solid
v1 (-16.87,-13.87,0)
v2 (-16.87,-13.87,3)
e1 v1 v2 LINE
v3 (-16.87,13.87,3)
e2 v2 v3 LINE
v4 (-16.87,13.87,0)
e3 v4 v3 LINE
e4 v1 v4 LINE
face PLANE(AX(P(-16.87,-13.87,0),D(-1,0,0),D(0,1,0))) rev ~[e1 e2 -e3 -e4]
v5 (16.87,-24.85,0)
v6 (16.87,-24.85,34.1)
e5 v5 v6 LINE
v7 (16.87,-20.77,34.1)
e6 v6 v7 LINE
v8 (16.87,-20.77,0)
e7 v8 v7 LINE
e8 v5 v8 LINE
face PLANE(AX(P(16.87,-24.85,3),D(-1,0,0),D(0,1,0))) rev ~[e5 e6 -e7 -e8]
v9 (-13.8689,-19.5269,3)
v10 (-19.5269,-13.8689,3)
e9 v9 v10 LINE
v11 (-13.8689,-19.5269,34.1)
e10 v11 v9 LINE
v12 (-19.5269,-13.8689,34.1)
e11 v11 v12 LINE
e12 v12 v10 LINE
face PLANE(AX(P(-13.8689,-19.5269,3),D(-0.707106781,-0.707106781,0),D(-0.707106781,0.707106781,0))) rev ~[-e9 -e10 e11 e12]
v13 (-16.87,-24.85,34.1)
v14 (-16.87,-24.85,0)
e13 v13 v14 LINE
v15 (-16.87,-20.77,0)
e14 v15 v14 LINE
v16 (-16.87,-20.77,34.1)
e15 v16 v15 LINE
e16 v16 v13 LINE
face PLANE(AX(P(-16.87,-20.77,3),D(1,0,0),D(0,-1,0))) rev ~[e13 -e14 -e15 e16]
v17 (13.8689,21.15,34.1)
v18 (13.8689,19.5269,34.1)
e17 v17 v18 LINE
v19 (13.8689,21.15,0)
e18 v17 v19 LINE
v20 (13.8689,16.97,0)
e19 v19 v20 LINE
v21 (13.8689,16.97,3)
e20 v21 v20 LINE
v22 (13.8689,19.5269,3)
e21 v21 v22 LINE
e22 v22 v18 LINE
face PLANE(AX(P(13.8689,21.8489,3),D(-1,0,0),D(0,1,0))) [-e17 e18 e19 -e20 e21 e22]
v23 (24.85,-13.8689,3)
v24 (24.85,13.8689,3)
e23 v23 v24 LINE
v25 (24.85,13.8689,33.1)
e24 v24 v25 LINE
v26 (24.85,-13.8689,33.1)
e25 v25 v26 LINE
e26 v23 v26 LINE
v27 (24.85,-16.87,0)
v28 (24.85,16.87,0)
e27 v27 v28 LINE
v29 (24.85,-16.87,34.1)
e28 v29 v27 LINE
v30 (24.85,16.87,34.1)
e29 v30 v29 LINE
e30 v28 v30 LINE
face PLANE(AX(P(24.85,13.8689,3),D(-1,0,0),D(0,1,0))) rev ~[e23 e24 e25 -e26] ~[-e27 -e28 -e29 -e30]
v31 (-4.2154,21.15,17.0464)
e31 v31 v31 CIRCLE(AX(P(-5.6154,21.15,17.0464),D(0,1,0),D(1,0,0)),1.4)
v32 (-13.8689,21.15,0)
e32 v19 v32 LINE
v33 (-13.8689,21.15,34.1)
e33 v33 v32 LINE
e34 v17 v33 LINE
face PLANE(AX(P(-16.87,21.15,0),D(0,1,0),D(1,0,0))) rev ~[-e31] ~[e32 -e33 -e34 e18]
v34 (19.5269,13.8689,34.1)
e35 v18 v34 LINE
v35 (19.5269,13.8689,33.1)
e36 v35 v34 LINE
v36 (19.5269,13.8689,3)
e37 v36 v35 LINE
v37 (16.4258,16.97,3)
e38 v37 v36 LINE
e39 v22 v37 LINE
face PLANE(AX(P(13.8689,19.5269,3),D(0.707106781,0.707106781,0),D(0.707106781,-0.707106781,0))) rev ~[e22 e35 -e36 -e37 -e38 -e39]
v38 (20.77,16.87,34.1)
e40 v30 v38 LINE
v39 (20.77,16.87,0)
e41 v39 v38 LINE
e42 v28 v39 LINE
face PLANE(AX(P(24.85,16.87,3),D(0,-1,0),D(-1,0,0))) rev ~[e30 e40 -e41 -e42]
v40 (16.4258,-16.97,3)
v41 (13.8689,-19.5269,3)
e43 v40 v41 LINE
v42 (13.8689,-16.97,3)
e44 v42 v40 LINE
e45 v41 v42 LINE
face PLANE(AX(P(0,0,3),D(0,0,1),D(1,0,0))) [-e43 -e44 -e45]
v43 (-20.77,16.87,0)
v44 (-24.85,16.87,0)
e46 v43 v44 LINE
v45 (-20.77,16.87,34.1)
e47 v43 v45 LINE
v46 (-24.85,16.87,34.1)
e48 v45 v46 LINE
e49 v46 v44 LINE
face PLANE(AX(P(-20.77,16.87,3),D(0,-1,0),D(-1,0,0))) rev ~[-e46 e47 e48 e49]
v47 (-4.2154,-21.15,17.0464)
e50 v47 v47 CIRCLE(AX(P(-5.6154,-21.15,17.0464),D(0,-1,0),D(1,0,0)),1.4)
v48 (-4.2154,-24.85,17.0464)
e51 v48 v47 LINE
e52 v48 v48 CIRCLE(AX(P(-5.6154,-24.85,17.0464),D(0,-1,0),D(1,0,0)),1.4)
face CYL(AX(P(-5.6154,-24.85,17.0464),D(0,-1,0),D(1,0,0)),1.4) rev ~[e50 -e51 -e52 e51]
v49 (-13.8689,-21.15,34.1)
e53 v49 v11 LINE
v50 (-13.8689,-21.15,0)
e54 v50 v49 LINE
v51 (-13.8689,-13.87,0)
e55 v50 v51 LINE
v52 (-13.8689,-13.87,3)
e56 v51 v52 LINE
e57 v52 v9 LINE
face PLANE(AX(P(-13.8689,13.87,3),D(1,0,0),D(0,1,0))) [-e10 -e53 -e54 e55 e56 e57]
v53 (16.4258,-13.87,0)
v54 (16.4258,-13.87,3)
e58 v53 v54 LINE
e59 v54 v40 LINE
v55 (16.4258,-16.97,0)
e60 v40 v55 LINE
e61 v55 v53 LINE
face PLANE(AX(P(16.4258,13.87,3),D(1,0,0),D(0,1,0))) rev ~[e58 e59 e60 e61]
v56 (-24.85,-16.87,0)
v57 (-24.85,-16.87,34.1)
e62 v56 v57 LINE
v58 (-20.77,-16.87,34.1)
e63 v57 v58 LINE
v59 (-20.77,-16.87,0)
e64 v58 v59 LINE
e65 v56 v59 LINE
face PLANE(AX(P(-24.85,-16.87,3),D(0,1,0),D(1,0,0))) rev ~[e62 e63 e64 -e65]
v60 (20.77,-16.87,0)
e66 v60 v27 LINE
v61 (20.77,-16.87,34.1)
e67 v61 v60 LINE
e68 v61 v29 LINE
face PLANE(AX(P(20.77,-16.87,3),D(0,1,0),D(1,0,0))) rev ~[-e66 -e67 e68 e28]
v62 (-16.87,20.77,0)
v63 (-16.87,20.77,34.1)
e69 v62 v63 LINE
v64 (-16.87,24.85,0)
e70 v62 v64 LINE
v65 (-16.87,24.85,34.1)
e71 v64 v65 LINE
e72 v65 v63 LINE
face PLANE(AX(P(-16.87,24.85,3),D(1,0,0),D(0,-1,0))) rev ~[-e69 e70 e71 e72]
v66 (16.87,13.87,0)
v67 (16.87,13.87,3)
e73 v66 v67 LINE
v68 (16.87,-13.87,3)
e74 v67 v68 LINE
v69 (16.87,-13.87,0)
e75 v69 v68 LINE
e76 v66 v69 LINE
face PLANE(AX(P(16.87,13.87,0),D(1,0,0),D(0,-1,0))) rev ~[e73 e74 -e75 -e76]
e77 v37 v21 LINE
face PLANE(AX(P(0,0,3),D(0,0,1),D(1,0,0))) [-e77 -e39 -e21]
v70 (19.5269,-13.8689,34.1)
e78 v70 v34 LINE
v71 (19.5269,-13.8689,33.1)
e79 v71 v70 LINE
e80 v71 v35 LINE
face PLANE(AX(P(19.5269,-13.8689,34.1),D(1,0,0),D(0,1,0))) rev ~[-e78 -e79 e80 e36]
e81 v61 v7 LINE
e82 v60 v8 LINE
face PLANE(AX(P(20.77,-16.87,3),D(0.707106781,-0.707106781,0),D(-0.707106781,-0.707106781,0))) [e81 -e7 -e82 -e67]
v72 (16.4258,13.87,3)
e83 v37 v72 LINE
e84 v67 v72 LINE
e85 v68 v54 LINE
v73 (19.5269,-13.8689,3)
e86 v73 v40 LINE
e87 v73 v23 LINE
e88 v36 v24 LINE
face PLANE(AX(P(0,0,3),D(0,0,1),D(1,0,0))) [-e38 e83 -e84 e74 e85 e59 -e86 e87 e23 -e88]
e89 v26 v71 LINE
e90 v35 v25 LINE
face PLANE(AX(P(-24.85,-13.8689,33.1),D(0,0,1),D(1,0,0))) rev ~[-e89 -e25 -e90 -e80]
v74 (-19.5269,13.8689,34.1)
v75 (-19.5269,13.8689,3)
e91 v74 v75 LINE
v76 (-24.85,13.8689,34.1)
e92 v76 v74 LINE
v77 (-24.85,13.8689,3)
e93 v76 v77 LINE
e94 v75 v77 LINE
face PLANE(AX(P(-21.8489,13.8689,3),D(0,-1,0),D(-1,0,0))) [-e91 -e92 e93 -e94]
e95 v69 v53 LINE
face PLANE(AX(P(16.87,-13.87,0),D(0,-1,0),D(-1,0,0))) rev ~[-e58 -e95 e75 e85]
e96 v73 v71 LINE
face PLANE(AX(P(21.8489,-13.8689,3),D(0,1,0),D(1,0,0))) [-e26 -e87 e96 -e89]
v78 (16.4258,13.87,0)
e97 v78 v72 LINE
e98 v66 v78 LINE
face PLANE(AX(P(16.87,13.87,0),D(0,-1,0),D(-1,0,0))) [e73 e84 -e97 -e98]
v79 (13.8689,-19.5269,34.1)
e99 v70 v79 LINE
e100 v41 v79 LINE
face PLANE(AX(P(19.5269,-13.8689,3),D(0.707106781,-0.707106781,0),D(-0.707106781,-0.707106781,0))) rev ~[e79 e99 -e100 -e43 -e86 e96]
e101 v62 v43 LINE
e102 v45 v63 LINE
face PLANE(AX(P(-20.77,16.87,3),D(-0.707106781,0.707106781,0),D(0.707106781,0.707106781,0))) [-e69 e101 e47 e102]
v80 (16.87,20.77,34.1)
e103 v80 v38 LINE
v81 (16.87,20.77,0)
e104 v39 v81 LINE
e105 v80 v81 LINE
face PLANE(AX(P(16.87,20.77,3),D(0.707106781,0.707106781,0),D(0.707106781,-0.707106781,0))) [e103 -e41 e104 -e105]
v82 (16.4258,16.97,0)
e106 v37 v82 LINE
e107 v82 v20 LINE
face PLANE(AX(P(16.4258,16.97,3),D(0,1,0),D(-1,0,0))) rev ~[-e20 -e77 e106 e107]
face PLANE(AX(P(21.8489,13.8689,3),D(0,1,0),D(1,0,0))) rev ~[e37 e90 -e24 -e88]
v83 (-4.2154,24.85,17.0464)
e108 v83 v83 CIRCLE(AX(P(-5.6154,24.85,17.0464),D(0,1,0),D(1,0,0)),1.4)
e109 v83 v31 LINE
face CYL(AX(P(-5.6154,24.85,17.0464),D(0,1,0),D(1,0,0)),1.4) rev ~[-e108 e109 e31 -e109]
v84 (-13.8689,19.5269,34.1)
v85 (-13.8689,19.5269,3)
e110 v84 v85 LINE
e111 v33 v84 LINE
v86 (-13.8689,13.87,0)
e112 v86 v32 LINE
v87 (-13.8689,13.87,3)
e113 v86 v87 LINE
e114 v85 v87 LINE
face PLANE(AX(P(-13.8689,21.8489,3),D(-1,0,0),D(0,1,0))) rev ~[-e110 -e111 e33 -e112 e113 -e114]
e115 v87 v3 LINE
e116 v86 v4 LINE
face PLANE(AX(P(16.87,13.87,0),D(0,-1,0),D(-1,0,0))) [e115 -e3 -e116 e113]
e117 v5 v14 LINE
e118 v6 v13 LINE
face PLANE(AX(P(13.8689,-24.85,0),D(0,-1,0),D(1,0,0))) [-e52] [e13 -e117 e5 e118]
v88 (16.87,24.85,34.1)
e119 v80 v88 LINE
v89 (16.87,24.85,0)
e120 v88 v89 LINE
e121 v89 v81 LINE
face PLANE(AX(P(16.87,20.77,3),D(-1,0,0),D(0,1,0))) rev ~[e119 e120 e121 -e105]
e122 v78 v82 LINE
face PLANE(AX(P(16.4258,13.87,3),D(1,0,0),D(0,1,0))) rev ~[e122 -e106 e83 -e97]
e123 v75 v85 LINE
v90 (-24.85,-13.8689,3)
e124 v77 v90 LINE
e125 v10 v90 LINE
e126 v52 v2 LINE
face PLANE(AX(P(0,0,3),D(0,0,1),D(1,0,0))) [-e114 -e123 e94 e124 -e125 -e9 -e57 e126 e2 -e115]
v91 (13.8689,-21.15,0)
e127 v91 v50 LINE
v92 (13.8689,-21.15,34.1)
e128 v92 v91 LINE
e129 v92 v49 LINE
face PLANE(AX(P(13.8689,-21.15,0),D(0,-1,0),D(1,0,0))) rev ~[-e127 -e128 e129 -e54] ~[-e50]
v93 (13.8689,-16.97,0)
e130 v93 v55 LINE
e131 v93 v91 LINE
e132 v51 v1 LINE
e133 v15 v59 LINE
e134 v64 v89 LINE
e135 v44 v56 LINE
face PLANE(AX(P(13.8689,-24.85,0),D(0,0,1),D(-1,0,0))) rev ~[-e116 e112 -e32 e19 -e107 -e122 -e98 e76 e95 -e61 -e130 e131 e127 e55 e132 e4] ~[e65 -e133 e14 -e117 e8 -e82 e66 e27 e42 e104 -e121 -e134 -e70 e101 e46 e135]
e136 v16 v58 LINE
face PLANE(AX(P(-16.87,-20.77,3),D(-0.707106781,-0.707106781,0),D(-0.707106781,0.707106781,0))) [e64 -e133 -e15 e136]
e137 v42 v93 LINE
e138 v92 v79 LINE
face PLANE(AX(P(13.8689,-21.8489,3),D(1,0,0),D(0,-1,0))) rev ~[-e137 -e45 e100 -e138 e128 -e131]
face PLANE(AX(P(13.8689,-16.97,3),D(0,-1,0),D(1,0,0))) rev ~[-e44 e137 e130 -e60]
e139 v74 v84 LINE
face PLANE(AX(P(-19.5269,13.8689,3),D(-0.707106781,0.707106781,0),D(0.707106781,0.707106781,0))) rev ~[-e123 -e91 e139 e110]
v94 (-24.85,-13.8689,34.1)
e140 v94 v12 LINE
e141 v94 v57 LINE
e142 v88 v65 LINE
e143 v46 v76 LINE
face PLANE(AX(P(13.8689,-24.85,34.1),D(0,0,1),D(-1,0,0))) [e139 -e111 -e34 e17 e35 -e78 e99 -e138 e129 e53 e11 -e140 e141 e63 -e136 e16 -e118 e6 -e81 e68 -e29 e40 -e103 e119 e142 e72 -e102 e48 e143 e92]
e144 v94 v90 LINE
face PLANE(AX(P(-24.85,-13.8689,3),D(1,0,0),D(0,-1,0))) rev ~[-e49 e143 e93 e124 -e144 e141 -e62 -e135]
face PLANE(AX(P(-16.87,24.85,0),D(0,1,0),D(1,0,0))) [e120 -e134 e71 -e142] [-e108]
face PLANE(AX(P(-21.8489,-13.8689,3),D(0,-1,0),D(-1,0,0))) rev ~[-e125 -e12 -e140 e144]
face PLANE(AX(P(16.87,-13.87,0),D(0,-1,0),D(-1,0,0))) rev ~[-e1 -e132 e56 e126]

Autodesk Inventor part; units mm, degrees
ref_plane "Work Plane1" through (0, 0, 0) normal (0, 0, 1) x (1, 0, 0)
sketch "Sketch1" plane through (0, 0, 0) normal (0, 0, 1) x (1, 0, 0)
  arc A0 (12.5934, -5.8404) -> (12.8401, -5.9947) centre (12.8241, -5.7459) ccw construction
  line L0 (12.8401, -5.9947) -> (16.4715, -5.9947) construction
  line L1 (16.4715, -5.9947) -> (16.97, -5.4961) construction
  line L2 (16.97, -5.4961) -> (16.97, 1.583) construction
  arc A1 (16.97, 2.3806) -> (16.97, 1.583) centre (17.2691, 1.9818) ccw construction
  line L3 (16.97, 2.3806) -> (16.97, 5.4715) construction
  line L4 (16.97, 5.4715) -> (16.4715, 5.97) construction
  line L5 (16.4715, 5.97) -> (12.8401, 5.97) construction
  arc A2 (12.8401, 5.97) -> (12.6094, 5.8152) centre (12.8401, 5.7207) ccw construction
  arc A3 (12.0954, 5.2394) -> (12.6094, 5.8152) centre (11.5075, 6.2814) ccw construction
  arc A4 (12.0954, 5.2394) -> (11.974, 5.0466) centre (12.2223, 5.0248) ccw construction
  line L6 (11.974, 5.0466) -> (11.9439, 4.702) construction
  arc A5 (11.6955, 4.4744) -> (11.9439, 4.702) centre (11.6955, 4.7237) ccw construction
  line L7 (11.6955, 4.4744) -> (11.2445, 4.4744) construction
  arc A6 (10.9961, 4.702) -> (11.2445, 4.4744) centre (11.2445, 4.7237) ccw construction
  line L8 (10.9961, 4.702) -> (10.9642, 5.0674) construction
  arc A7 (10.9642, 5.0674) -> (10.8487, 5.2566) centre (10.7158, 5.0457) ccw construction
  arc A8 (10.3792, 5.8152) -> (10.8487, 5.2566) centre (11.4862, 6.2691) ccw construction
  arc A9 (10.3792, 5.8152) -> (10.1485, 5.97) centre (10.1485, 5.7206) ccw construction
  line L9 (10.1485, 5.97) -> (9.4685, 5.97) construction
  line L10 (9.4685, 5.97) -> (8.97, 5.4715) construction
  line L11 (8.97, 5.4715) -> (8.97, -5.4961) construction
  line L12 (8.97, -5.4961) -> (9.4685, -5.9947) construction
  line L13 (9.4685, -5.9947) -> (10.1412, -5.9947) construction
  arc A10 (10.1412, -5.9947) -> (10.3791, -5.84) centre (10.1485, -5.7455) ccw construction
  arc A11 (10.8487, -5.2813) -> (10.3791, -5.84) centre (11.4862, -6.2938) ccw construction
  arc A12 (10.8487, -5.2813) -> (10.9642, -5.0921) centre (10.7158, -5.0704) ccw construction
  line L14 (10.9642, -5.0921) -> (10.9961, -4.7266) construction
  arc A13 (11.2445, -4.4991) -> (10.9961, -4.7266) centre (11.2445, -4.7483) ccw construction
  line L15 (11.2445, -4.4991) -> (11.6955, -4.4991) construction
  arc A14 (11.9439, -4.7266) -> (11.6955, -4.4991) centre (11.6955, -4.7483) ccw construction
  line L16 (11.9439, -4.7266) -> (11.974, -5.0712) construction
  arc A15 (11.974, -5.0712) -> (12.0954, -5.264) centre (12.2223, -5.0495) ccw construction
  arc A16 (12.5934, -5.8404) -> (12.0954, -5.264) centre (11.4862, -6.2938) ccw construction
  arc A17 (24.85, 22.85) -> (22.85, 24.85) centre (22.85, 22.85) ccw construction
  line L17 (22.85, 24.85) -> (-16.97, 24.85) construction
  line L18 (-16.97, 24.85) -> (-16.97, 21.15) construction
  line L19 (-16.97, 21.15) -> (16.97, 21.15) construction
  line L20 (16.97, 16.97) -> (16.97, 21.15) construction
  line L21 (21.15, 16.97) -> (16.97, 16.97) construction
  line L22 (21.15, 16.97) -> (21.15, -16.97) construction
  line L23 (21.15, -16.97) -> (24.85, -16.97) construction
  line L24 (24.85, -16.97) -> (24.85, 22.85) construction
  line L25 (23.75, 23.25) -> (23.75, 18.15) construction
  arc A18 (23.25, 17.65) -> (23.75, 18.15) centre (23.25, 18.15) ccw construction
  line L26 (23.25, 17.65) -> (20.8937, 17.65) construction
  arc A19 (20.5239, 17.8134) -> (20.8937, 17.65) centre (20.8937, 18.15) ccw construction
  line L27 (20.5239, 17.8134) -> (17.7803, 20.8273) construction
  arc A20 (17.65, 21.1639) -> (17.7803, 20.8273) centre (18.15, 21.1639) ccw construction
  line L28 (17.65, 21.1639) -> (17.65, 23.25) construction
  arc A21 (18.15, 23.75) -> (17.65, 23.25) centre (18.15, 23.25) ccw construction
  line L29 (18.15, 23.75) -> (23.25, 23.75) construction
  arc A22 (23.75, 23.25) -> (23.25, 23.75) centre (23.25, 23.25) ccw construction
  arc A23 (-24.85, -22.85) -> (-22.85, -24.85) centre (-22.85, -22.85) ccw construction
  line L30 (-22.85, -24.85) -> (16.97, -24.85) construction
  line L31 (16.97, -24.85) -> (16.97, -21.15) construction
  line L32 (16.97, -21.15) -> (-16.97, -21.15) construction
  line L33 (-16.97, -16.97) -> (-16.97, -21.15) construction
  line L34 (-21.15, -16.97) -> (-16.97, -16.97) construction
  line L35 (-21.15, -16.97) -> (-21.15, 16.97) construction
  line L36 (-21.15, 16.97) -> (-24.85, 16.97) construction
  line L37 (-24.85, 16.97) -> (-24.85, -22.85) construction
  line L38 (-20.8273, -17.7803) -> (-17.8134, -20.5239) construction
  arc A24 (-17.65, -20.8937) -> (-17.8134, -20.5239) centre (-18.15, -20.8937) ccw construction
  line L39 (-17.65, -20.8937) -> (-17.65, -23.25) construction
  arc A25 (-18.15, -23.75) -> (-17.65, -23.25) centre (-18.15, -23.25) ccw construction
  line L40 (-18.15, -23.75) -> (-23.25, -23.75) construction
  arc A26 (-23.75, -23.25) -> (-23.25, -23.75) centre (-23.25, -23.25) ccw construction
  line L41 (-23.75, -23.25) -> (-23.75, -18.15) construction
  arc A27 (-23.25, -17.65) -> (-23.75, -18.15) centre (-23.25, -18.15) ccw construction
  line L42 (-23.25, -17.65) -> (-21.1639, -17.65) construction
  arc A28 (-20.8273, -17.7803) -> (-21.1639, -17.65) centre (-21.1639, -18.15) ccw construction
  arc A29 (-22.85, 24.85) -> (-24.85, 22.85) centre (-22.85, 22.85) ccw construction
  line L43 (-22.85, 24.85) -> (16.97, 24.85) construction
  line L44 (16.97, 24.85) -> (16.97, 21.15) construction
  line L45 (16.97, 21.15) -> (-16.97, 21.15) construction
  line L46 (-16.97, 16.97) -> (-16.97, 21.15) construction
  line L47 (-21.15, 16.97) -> (-16.97, 16.97) construction
  line L48 (-21.15, 16.97) -> (-21.15, -16.97) construction
  line L49 (-21.15, -16.97) -> (-24.85, -16.97) construction
  line L50 (-24.85, -16.97) -> (-24.85, 22.85) construction
  line L51 (-20.8273, 17.7803) -> (-17.8134, 20.5239) construction
  arc A30 (-17.8134, 20.5239) -> (-17.65, 20.8937) centre (-18.15, 20.8937) ccw construction
  line L52 (-17.65, 20.8937) -> (-17.65, 23.25) construction
  arc A31 (-17.65, 23.25) -> (-18.15, 23.75) centre (-18.15, 23.25) ccw construction
  line L53 (-18.15, 23.75) -> (-23.25, 23.75) construction
  arc A32 (-23.25, 23.75) -> (-23.75, 23.25) centre (-23.25, 23.25) ccw construction
  line L54 (-23.75, 23.25) -> (-23.75, 18.15) construction
  arc A33 (-23.75, 18.15) -> (-23.25, 17.65) centre (-23.25, 18.15) ccw construction
  line L55 (-23.25, 17.65) -> (-21.1639, 17.65) construction
  arc A34 (-21.1639, 17.65) -> (-20.8273, 17.7803) centre (-21.1639, 18.15) ccw construction
  arc A35 (22.85, -24.85) -> (24.85, -22.85) centre (22.85, -22.85) ccw construction
  line L56 (22.85, -24.85) -> (-16.97, -24.85) construction
  line L57 (-16.97, -24.85) -> (-16.97, -21.15) construction
  line L58 (-16.97, -21.15) -> (16.97, -21.15) construction
  line L59 (16.97, -16.97) -> (16.97, -21.15) construction
  line L60 (21.15, -16.97) -> (16.97, -16.97) construction
  line L61 (21.15, -16.97) -> (21.15, 16.97) construction
  line L62 (21.15, 16.97) -> (24.85, 16.97) construction
  line L63 (24.85, 16.97) -> (24.85, -22.85) construction
  line L64 (23.75, -23.25) -> (23.75, -18.15) construction
  arc A36 (23.75, -18.15) -> (23.25, -17.65) centre (23.25, -18.15) ccw construction
  line L65 (23.25, -17.65) -> (20.8937, -17.65) construction
  arc A37 (20.8937, -17.65) -> (20.5239, -17.8134) centre (20.8937, -18.15) ccw construction
  line L66 (20.5239, -17.8134) -> (17.7803, -20.8273) construction
  arc A38 (17.7803, -20.8273) -> (17.65, -21.1639) centre (18.15, -21.1639) ccw construction
  line L67 (17.65, -21.1639) -> (17.65, -23.25) construction
  arc A39 (17.65, -23.25) -> (18.15, -23.75) centre (18.15, -23.25) ccw construction
  line L68 (18.15, -23.75) -> (23.25, -23.75) construction
  arc A40 (23.25, -23.75) -> (23.75, -23.25) centre (23.25, -23.25) ccw construction
  circle A41 centre (0.47, -10.47) radius 1.1 construction
  circle A42 centre (0.47, 12.53) radius 1.025 construction
  line L69 (24.85, 16.87) -> (16.87, 16.87)
  line L70 (16.87, 16.87) -> (16.87, -16.87)
  line L71 (16.87, -16.87) -> (24.85, -16.87)
  line L72 (24.85, -16.87) -> (24.85, 16.87)
  line L73 (-16.87, 24.85) -> (16.87, 24.85)
  line L74 (16.87, 24.85) -> (16.87, 13.87)
  line L75 (16.87, 13.87) -> (-16.87, 13.87)
  line L76 (-16.87, 13.87) -> (-16.87, 24.85)
  line L77 (-16.87, 16.87) -> (-24.85, 16.87)
  line L78 (-24.85, 16.87) -> (-24.85, -16.87)
  line L79 (-24.85, -16.87) -> (-16.87, -16.87)
  line L80 (-16.87, -16.87) -> (-16.87, 16.87)
  line L81 (-16.87, -24.85) -> (16.87, -24.85)
  line L82 (16.87, -24.85) -> (16.87, -13.87)
  line L83 (16.87, -13.87) -> (-16.87, -13.87)
  line L84 (-16.87, -13.87) -> (-16.87, -24.85)
  point P0 (0, 0)
extrude "Extrusion1" add sketch "Sketch1" along normal blind 3 contours L72 L71 L70 L69 | L70 L75 L76 L73 L74 | L82 L81 L84 L80 L83 L70 | L80 L79 L78 L77 L76
chamfer "Chamfer1" distance 3.9 angle 45 4 edges at (16.87, -16.87, 1.5) (-16.87, -16.87, 1.5) (-16.87, 16.87, 1.5) (16.87, 16.87, 1.5)
sketch "Sketch2" plane through (0, 0, 3) normal (0, 0, 1) x (1, 0, 0)
  line L0 (-16.87, -13.87) -> (-16.87, 13.87) projected
  line L1 (-16.87, 13.87) -> (16.87, 13.87) projected
  line L2 (16.87, 13.87) -> (16.87, -13.87) projected
  line L3 (16.87, -13.87) -> (-16.87, -13.87) projected
  line L4 (-16.87, -20.77) -> (-16.87, -24.85) projected
  line L5 (-16.87, -24.85) -> (16.87, -24.85) projected
  line L6 (16.87, -24.85) -> (16.87, -20.77) projected
  line L7 (20.77, -16.87) -> (16.87, -20.77) projected
  line L8 (20.77, -16.87) -> (24.85, -16.87) projected
  line L9 (24.85, -16.87) -> (24.85, 16.87) projected
  line L10 (24.85, 16.87) -> (20.77, 16.87) projected
  line L11 (16.87, 20.77) -> (20.77, 16.87) projected
  line L12 (16.87, 20.77) -> (16.87, 24.85) projected
  line L13 (16.87, 24.85) -> (-16.87, 24.85) projected
  line L14 (-16.87, 24.85) -> (-16.87, 20.77) projected
  line L15 (-20.77, 16.87) -> (-16.87, 20.77) projected
  line L16 (-20.77, 16.87) -> (-24.85, 16.87) projected
  line L17 (-24.85, 16.87) -> (-24.85, -16.87) projected
  line L18 (-24.85, -16.87) -> (-20.77, -16.87) projected
  line L19 (-16.87, -20.77) -> (-20.77, -16.87) projected
  line L20 (13.8689, -19.5269) -> (13.8689, -21.8489)
  line L21 (-13.8689, -21.8489) -> (-13.8689, -19.5269)
  line L22 (-13.8689, -19.5269) -> (-19.5269, -13.8689)
  line L23 (-19.5269, -13.8689) -> (-21.8489, -13.8689)
  line L24 (-21.8489, 13.8689) -> (-19.5269, 13.8689)
  line L25 (-19.5269, 13.8689) -> (-13.8689, 19.5269)
  line L26 (-13.8689, 19.5269) -> (-13.8689, 21.8489)
  line L27 (13.8689, 21.8489) -> (13.8689, 19.5269)
  line L28 (13.8689, 19.5269) -> (19.5269, 13.8689)
  line L29 (19.5269, 13.8689) -> (21.8489, 13.8689)
  line L30 (21.8489, -13.8689) -> (19.5269, -13.8689)
  line L31 (19.5269, -13.8689) -> (13.8689, -19.5269)
  line L32 (13.8689, -21.8489) -> (13.8689, -24.85)
  line L33 (16.87, -24.85) -> (-16.87, -24.85) projected
  line L34 (21.8489, -13.8689) -> (24.85, -13.8689)
  line L35 (24.85, -16.87) -> (24.85, 16.87) projected
  line L36 (21.8489, 13.8689) -> (24.85, 13.8689)
  line L37 (13.8689, 21.8489) -> (13.8689, 24.85)
  line L38 (-13.8689, 21.8489) -> (-13.8689, 24.85)
  line L39 (-21.8489, 13.8689) -> (-24.85, 13.8689)
  line L40 (-21.8489, -13.8689) -> (-24.85, -13.8689)
  line L41 (-13.8689, -21.8489) -> (-13.8689, -24.85)
  line L42 (13.8689, -21.8489) -> (11.5469, -21.8489)
  line L43 (-11.5469, -21.8489) -> (-13.8689, -21.8489)
  line L44 (21.8489, 13.8689) -> (21.8489, 11.5469)
  line L45 (21.8489, -11.5469) -> (21.8489, -13.8689)
  line L46 (-21.8489, -13.8689) -> (-21.8489, -11.5469)
  line L47 (-21.8489, 11.5469) -> (-21.8489, 13.8689)
  line L48 (-13.8689, 21.8489) -> (-11.5469, 21.8489)
  line L49 (11.5469, 21.8489) -> (13.8689, 21.8489)
  point P0 (0, 0)
  dimension "d13" = 3.0011
ref_plane "Work Plane2" through (-16.97, -24.85, 34.1) normal (0, 0, -1) x (0, 1, 0)
extrude "Extrusion2" add sketch "Sketch2" along normal up to surface (31.1 mm away) contours L32 L20 L31 L30 L34 L9 L8 L7 L6 L5
pattern_circular "Circular Pattern1" count 4 over 360 about axis through (0, 0, 17.13) along (0, 0, -1) of "Extrusion2"
sketch "Sketch3" plane through (-24.85, -13.8689, 34.1) normal (0, 0, 1) x (1, 0, 0)
  circle A0 centre (13.82, 14.8989) radius 1.5 projected
  line L0 (10.9811, -5.658) -> (5.3231, 0) projected
  line L1 (5.3231, 0) -> (0, 0) projected
  line L2 (0, 0) -> (0, -3.0011) projected
  line L3 (0, -3.0011) -> (4.08, -3.0011) projected
  line L4 (4.08, -3.0011) -> (7.98, -6.9011) projected
  line L5 (7.98, -6.9011) -> (7.98, -10.9811) projected
  line L6 (7.98, -10.9811) -> (10.9811, -10.9811) projected
  line L7 (10.9811, -10.9811) -> (10.9811, -5.658) projected
  line L8 (5.3231, 27.7378) -> (10.9811, 33.3958) projected
  line L9 (10.9811, 33.3958) -> (10.9811, 38.7189) projected
  line L10 (10.9811, 38.7189) -> (7.98, 38.7189) projected
  line L11 (7.98, 38.7189) -> (7.98, 34.6389) projected
  line L12 (7.98, 34.6389) -> (4.08, 30.7389) projected
  line L13 (4.08, 30.7389) -> (0, 30.7389) projected
  line L14 (0, 30.7389) -> (0, 27.7378) projected
  line L15 (0, 27.7378) -> (5.3231, 27.7378) projected
  line L16 (10.9811, -10.9811) -> (16.9811, -10.9811)
  line L17 (16.9811, 38.7189) -> (10.9811, 38.7189)
  line L18 (0, 0) -> (0, 27.7378)
  line L19 (0, 0) -> (5.3231, 0)
  line L20 (5.3231, 0) -> (5.3231, 27.7378)
  line L21 (5.3231, 27.7378) -> (0, 27.7378)
  line L22 (0, 27.7378) -> (0, 0)
  line L23 (5.3231, 0) -> (0, 0) projected
  line L24 (5.3231, 0) -> (10.9811, -5.658)
  line L25 (10.9811, 33.3958) -> (5.3231, 27.7378)
  line L26 (38.7189, 38.7189) -> (38.7189, 33.3958) projected
  line L27 (38.7189, -5.658) -> (38.7189, -10.9811) projected
  line L28 (10.9811, -10.9811) -> (38.7189, -10.9811)
  line L29 (38.7189, -10.9811) -> (38.7189, -5.658)
  line L30 (38.7189, -5.658) -> (10.9811, -5.658)
  line L31 (10.9811, -5.658) -> (10.9811, -10.9811)
  line L32 (10.9811, 38.7189) -> (10.9811, 33.3958) projected
  line L33 (10.9811, 38.7189) -> (38.7189, 38.7189)
  line L34 (38.7189, 38.7189) -> (38.7189, 33.3958)
  line L35 (38.7189, 33.3958) -> (10.9811, 33.3958)
  line L36 (10.9811, 33.3958) -> (10.9811, 38.7189)
  line L37 (16.9811, -10.9811) -> (16.9811, -5.658)
  line L38 (16.9811, 33.3958) -> (16.9811, 38.7189)
  line L39 (10.9811, 38.7189) -> (10.9811, 33.3958)
  line L40 (10.9811, -5.658) -> (10.9811, -10.9811)
  line L41 (10.9811, -5.658) -> (10.9811, 0)
  line L42 (10.9811, 27.7378) -> (10.9811, 33.3958)
  line L43 (49.7, 0) -> (44.3769, 0) projected
  line L44 (44.3769, 27.7378) -> (49.7, 27.7378) projected
  line L45 (44.3769, 27.7378) -> (49.7, 27.7378)
  line L46 (49.7, 27.7378) -> (49.7, 0)
  line L47 (49.7, 0) -> (44.3769, 0)
  line L48 (44.3769, 0) -> (44.3769, 27.7378)
  point P0 (24.85, 13.8689)
  dimension "d19" = 6
extrude "Extrusion3" add sketch "Sketch3" against normal blind 1 contours L7 L6 L5 L4 L3 L2 L1 L0 | L15 L14 L13 L12 L11 L10 L9 L8 | L43 L48 L44 L46
sketch "Sketch4" plane through (24.85, -16.87, 0) normal (1, 0, 0) x (0, 0, -1)
  line L0 (37.9, 11.3739) -> (37.9, 18.453) construction
  line L1 (23.6194, 18.453) -> (37.9, 18.453) construction
  arc A0 (22.1806, 18.453) -> (23.6194, 18.453) centre (22.9, 16.8577) ccw construction
  line L2 (-1.3806, 18.453) -> (22.1806, 18.453) construction
  arc A1 (-2.8194, 18.453) -> (-1.3806, 18.453) centre (-2.1, 16.8577) ccw construction
  line L3 (-31.3806, 18.453) -> (-2.8194, 18.453) construction
  arc A2 (-32.8194, 18.453) -> (-31.3806, 18.453) centre (-32.1, 16.8577) ccw construction
  line L4 (-42.1, 18.453) -> (-32.8194, 18.453) construction
  line L5 (-42.1, 11.3739) -> (-42.1, 18.453) construction
  line L6 (-42.1, 11.3739) -> (37.9, 11.3739) construction
  line L7 (37.9, 19.2506) -> (37.9, 22.3415) construction
  line L8 (-42.1, 22.3415) -> (37.9, 22.3415) construction
  line L9 (-42.1, 19.2506) -> (-42.1, 22.3415) construction
  line L10 (-42.1, 19.2506) -> (37.9, 19.2506) construction
  line L11 (-3, 3.0011) -> (-3, 30.7389) construction
  line L12 (-34.1, 33.84) -> (-34.1, -5.98) construction
  line L13 (-3, 11.3739) -> (-34.1, 11.3739)
  line L14 (-34.1, 11.3739) -> (-34.1, 22.3415)
  line L15 (-34.1, 22.3415) -> (-3, 22.3415)
  line L16 (-3, 22.3415) -> (-3, 11.3739)
  line L17 (-34.1, 11.3739) -> (-32.1, 11.3739)
  line L18 (-32.1, 11.3739) -> (-32.1, 3.0011)
  line L19 (-32.1, 3.0011) -> (-34.1, 3.0011)
  line L20 (-34.1, 3.0011) -> (-34.1, 11.3739)
  line L21 (-34.1, 22.3415) -> (-32.1, 22.3415)
  line L22 (-32.1, 22.3415) -> (-32.1, 30.7389)
  line L23 (-32.1, 30.7389) -> (-34.1, 30.7389)
  line L24 (-34.1, 30.7389) -> (-34.1, 22.3415)
  point P0 (0, 16.87)
  dimension "d24" = 2
ref_plane "Work Plane3" through (16.97, -5.4961, -37.9) normal (1, 0, 0) x (0, 1, 0)
sketch "Sketch7" plane through (0, 0, 0) normal (0, 0, -1) x (-1, 0, 0)
  arc A0 (18.93, 12.43) -> (22.43, 8.93) centre (22.43, 12.43) ccw construction
  line L0 (18.93, 12.43) -> (18.93, 14.53) construction
  line L1 (3.13, 14.53) -> (18.93, 14.53) construction
  line L2 (3.13, 14.53) -> (3.13, 12.43) construction
  arc A1 (-0.37, 8.93) -> (3.13, 12.43) centre (-0.37, 12.43) ccw construction
  line L3 (-0.37, 8.93) -> (-2.47, 8.93) construction
  line L4 (-2.47, -6.87) -> (-2.47, 8.93) construction
  line L5 (-2.47, -6.87) -> (-0.37, -6.87) construction
  arc A2 (3.13, -10.37) -> (-0.37, -6.87) centre (-0.37, -10.37) ccw construction
  line L6 (3.13, -10.37) -> (3.13, -12.47) construction
  line L7 (18.93, -12.47) -> (3.13, -12.47) construction
  line L8 (18.93, -12.47) -> (18.93, -10.37) construction
  arc A3 (22.43, -6.87) -> (18.93, -10.37) centre (22.43, -10.37) ccw construction
  line L9 (22.43, -6.87) -> (24.53, -6.87) construction
  line L10 (24.53, 8.93) -> (24.53, -6.87) construction
  line L11 (24.53, 8.93) -> (22.43, 8.93) construction
  circle A4 centre (11.03, 1.03) radius 2.5 construction
  arc A5 (-1.5344, 11.2045) -> (0.934, 13.4886) centre (-0.47, 12.53) ccw construction
  circle A6 centre (-0.47, -10.47) radius 1.1 construction
  arc A7 (0.5944, 13.8555) -> (-1.874, 11.5714) centre (-0.47, 12.53) ccw construction
  line L12 (-19.5269, -13.8689) -> (-24.85, -13.8689) construction
  line L13 (-16.87, 13.87) -> (-16.87, -13.87) construction
  line L14 (-16.87, -13.87) -> (16.87, -13.87) construction
  line L15 (16.87, -13.87) -> (16.87, 13.87) construction
  line L16 (16.87, 13.87) -> (-16.87, 13.87) construction
  line L17 (-19.5269, 13.8689) -> (-13.8689, 19.5269) construction
  line L18 (-13.8689, 19.5269) -> (-13.8689, 24.85) construction
  line L19 (-13.8689, 24.85) -> (13.8689, 24.85) construction
  line L20 (13.8689, 24.85) -> (13.8689, 19.5269) construction
  line L21 (13.8689, 19.5269) -> (19.5269, 13.8689) construction
  line L22 (19.5269, 13.8689) -> (24.85, 13.8689) construction
  line L23 (24.85, 13.8689) -> (24.85, -13.8689) construction
  line L24 (24.85, -13.8689) -> (19.5269, -13.8689) construction
  line L25 (19.5269, -13.8689) -> (13.8689, -19.5269) construction
  line L26 (13.8689, -19.5269) -> (13.8689, -24.85) construction
  line L27 (13.8689, -24.85) -> (-13.8689, -24.85) construction
  line L28 (-13.8689, -24.85) -> (-13.8689, -19.5269) construction
  line L29 (-13.8689, -19.5269) -> (-19.5269, -13.8689) construction
  line L30 (16.87, 13.87) -> (-16.87, 13.87) construction
  line L31 (16.87, 13.87) -> (-19.5258, 13.87) projected
  line L32 (-2.13, 13.87) -> (16.87, 13.87)
  line L33 (16.87, 13.87) -> (16.87, -16.45)
  line L34 (16.87, -16.45) -> (-2.13, -16.45)
  line L35 (-2.13, -16.45) -> (-2.13, 13.87)
  line L36 (16.97, 16.97) -> (-16.97, 16.97)
  line L37 (16.87, 13.87) -> (-2.13, 13.87)
  line L38 (-2.13, 13.87) -> (-2.13, 16.45)
  line L39 (-2.13, 16.45) -> (16.87, 16.45)
  line L40 (16.87, 16.45) -> (16.87, 13.87)
  line L41 (-16.97, -16.97) -> (16.97, -16.97) construction
  line L42 (-24.85, -13.8689) -> (-24.85, 13.8689) projected
  line L43 (-24.85, 13.8689) -> (-19.5269, 13.8689) projected
  point P0 (0, 0)
  dimension "d35" = 19
  dimension "d36" = 0
  dimension "d74" = 16.45
  dimension "d75" = 16.45
ref_plane "Work Plane4" through (-25.03, -12.97, -12) normal (0, 0, 1) x (1, 0, 0)
sketch "Sketch14" plane through (-16.87, 24.85, 0) normal (0, 1, 0) x (1, 0, 0)
  line L0 (3.0011, -3) -> (3.0011, -34.1) projected
  line L1 (30.7389, -3) -> (3.0011, -3) projected
  line L2 (30.7389, -3) -> (30.7389, -34.1) projected
  line L3 (33.74, -34.1) -> (30.7389, -34.1) projected
  line L4 (33.74, 0) -> (33.74, -34.1) projected
  line L5 (33.74, 0) -> (0, 0) projected
  line L6 (0, 0) -> (0, -34.1) projected
  line L7 (3.0011, -34.1) -> (0, -34.1) projected
  line L8 (3.0011, -3) -> (3.0011, -34.1) projected
  line L9 (30.7389, -34.1) -> (36.3969, -34.1) projected
  line L10 (3.0011, -3) -> (30.7389, -3)
  line L11 (30.7389, -3) -> (30.7389, -34.1)
  line L12 (30.7389, -34.1) -> (3.0011, -34.1)
  line L13 (3.0011, -34.1) -> (3.0011, -3)
  circle A0 centre (11.8112, -17.0464) radius 1.4 construction
  circle A1 centre (11.2546, -17.0464) radius 1.4
  point P0 (16.87, 0)
  dimension "d89" = 2.8
extrude "Extrusion12" add sketch "Sketch14" against normal up to surface (3.7 mm away) contours L1 L2 L12 L0
sketch "Sketch15" plane through (0, 0, 3) normal (0, 0, 1) x (1, 0, 0)
  line L0 (19.5269, 13.8689) -> (13.8689, 19.5269) projected
  line L1 (2.2647, -16.97) -> (16.4258, -16.97)
  line L2 (16.4258, -16.97) -> (16.4258, 16.97)
  line L3 (16.4258, 16.97) -> (2.2647, 16.97)
  line L4 (2.2647, 16.97) -> (2.2647, -16.97)
  line L5 (2.2647, -16.97) -> (16.4258, 16.97) construction
  line L6 (16.4258, -16.97) -> (2.2647, 16.97) construction
  line L7 (13.8689, -24.85) -> (13.8689, -19.5269) projected
  line L8 (13.8689, -19.5269) -> (19.5269, -13.8689) projected
  line L9 (19.5269, -13.8689) -> (24.85, -13.8689) projected
  line L10 (24.85, -13.8689) -> (24.85, 13.8689) projected
  line L11 (16.87, 13.87) -> (16.87, -13.87) projected
  line L12 (16.87, -13.87) -> (-16.87, -13.87) projected
  line L13 (-16.87, -13.87) -> (-16.87, 13.87) projected
  line L14 (-16.87, 13.87) -> (16.87, 13.87) projected
  line L15 (24.85, 13.8689) -> (19.5269, 13.8689) projected
  line L16 (19.5269, 13.8689) -> (13.8689, 19.5269) projected
  line L17 (13.8689, 19.5269) -> (13.8689, 21.15) projected
  line L18 (-13.8689, 21.15) -> (-13.8689, 19.5269) projected
  line L19 (-13.8689, 19.5269) -> (-19.5269, 13.8689) projected
  line L20 (-19.5269, 13.8689) -> (-24.85, 13.8689) projected
  line L21 (-24.85, 13.8689) -> (-24.85, -13.8689) projected
  line L22 (-24.85, -13.8689) -> (-19.5269, -13.8689) projected
  line L23 (-19.5269, -13.8689) -> (-13.8689, -19.5269) projected
  line L24 (-13.8689, -19.5269) -> (-13.8689, -24.85) projected
  line L25 (13.8689, 19.5269) -> (13.8689, -19.5269)
  line L26 (16.87, 24.85) -> (-16.87, 24.85) projected
  line L27 (-13.8689, -19.5269) -> (-19.5269, -13.8689) projected
  line L28 (-13.8689, -19.5269) -> (-13.8689, 19.5269)
  line L29 (13.8689, 21.15) -> (-13.8689, 21.15) projected
  line L30 (-13.8689, -24.85) -> (13.8689, -24.85) projected
  point P0 (0, 0)
  point P1 (9.3452, 0)
extrude "Extrusion13" cut sketch "Sketch15" against normal through all contours L2 L14 L25 L3 | L25 L3 L4 L14 L28 L18 L29 L17 | L2 L12 L25 L14 | L25 L14 L4 L3 | L2 L1 L25 L12 | L25 L12 L4 L14 | L25 L1 L4 L12 | L4 L12 L28 L14 | L25 L7 L30 L24 L28 L12 L4 L1
sketch "Sketch16" plane through (13.8689, -24.85, 0) normal (0, -1, 0) x (1, 0, 0)
  circle A0 centre (-19.4843, 17.0464) radius 1.4 projected
  line L0 (0, 34.1) -> (-27.7378, 34.1) projected
  line L1 (-27.7378, 0) -> (-27.7378, 34.1) projected
  line L2 (0, 0) -> (-27.7378, 0) projected
  line L3 (0, 34.1) -> (0, 0) projected
  point P0 (-13.8689, 0)
extrude "Extrusion14" add sketch "Sketch16" against normal blind 3.7
equation "\"d2\" = d1"
equation "\"d3\" = d1"
equation "\"d4\" = d1"
equation "\"d5\" = d1"
equation "\"d1\" = 0.1"
properties part number "30_Cube_Z_Focus_MGN_manual_base_v3"
